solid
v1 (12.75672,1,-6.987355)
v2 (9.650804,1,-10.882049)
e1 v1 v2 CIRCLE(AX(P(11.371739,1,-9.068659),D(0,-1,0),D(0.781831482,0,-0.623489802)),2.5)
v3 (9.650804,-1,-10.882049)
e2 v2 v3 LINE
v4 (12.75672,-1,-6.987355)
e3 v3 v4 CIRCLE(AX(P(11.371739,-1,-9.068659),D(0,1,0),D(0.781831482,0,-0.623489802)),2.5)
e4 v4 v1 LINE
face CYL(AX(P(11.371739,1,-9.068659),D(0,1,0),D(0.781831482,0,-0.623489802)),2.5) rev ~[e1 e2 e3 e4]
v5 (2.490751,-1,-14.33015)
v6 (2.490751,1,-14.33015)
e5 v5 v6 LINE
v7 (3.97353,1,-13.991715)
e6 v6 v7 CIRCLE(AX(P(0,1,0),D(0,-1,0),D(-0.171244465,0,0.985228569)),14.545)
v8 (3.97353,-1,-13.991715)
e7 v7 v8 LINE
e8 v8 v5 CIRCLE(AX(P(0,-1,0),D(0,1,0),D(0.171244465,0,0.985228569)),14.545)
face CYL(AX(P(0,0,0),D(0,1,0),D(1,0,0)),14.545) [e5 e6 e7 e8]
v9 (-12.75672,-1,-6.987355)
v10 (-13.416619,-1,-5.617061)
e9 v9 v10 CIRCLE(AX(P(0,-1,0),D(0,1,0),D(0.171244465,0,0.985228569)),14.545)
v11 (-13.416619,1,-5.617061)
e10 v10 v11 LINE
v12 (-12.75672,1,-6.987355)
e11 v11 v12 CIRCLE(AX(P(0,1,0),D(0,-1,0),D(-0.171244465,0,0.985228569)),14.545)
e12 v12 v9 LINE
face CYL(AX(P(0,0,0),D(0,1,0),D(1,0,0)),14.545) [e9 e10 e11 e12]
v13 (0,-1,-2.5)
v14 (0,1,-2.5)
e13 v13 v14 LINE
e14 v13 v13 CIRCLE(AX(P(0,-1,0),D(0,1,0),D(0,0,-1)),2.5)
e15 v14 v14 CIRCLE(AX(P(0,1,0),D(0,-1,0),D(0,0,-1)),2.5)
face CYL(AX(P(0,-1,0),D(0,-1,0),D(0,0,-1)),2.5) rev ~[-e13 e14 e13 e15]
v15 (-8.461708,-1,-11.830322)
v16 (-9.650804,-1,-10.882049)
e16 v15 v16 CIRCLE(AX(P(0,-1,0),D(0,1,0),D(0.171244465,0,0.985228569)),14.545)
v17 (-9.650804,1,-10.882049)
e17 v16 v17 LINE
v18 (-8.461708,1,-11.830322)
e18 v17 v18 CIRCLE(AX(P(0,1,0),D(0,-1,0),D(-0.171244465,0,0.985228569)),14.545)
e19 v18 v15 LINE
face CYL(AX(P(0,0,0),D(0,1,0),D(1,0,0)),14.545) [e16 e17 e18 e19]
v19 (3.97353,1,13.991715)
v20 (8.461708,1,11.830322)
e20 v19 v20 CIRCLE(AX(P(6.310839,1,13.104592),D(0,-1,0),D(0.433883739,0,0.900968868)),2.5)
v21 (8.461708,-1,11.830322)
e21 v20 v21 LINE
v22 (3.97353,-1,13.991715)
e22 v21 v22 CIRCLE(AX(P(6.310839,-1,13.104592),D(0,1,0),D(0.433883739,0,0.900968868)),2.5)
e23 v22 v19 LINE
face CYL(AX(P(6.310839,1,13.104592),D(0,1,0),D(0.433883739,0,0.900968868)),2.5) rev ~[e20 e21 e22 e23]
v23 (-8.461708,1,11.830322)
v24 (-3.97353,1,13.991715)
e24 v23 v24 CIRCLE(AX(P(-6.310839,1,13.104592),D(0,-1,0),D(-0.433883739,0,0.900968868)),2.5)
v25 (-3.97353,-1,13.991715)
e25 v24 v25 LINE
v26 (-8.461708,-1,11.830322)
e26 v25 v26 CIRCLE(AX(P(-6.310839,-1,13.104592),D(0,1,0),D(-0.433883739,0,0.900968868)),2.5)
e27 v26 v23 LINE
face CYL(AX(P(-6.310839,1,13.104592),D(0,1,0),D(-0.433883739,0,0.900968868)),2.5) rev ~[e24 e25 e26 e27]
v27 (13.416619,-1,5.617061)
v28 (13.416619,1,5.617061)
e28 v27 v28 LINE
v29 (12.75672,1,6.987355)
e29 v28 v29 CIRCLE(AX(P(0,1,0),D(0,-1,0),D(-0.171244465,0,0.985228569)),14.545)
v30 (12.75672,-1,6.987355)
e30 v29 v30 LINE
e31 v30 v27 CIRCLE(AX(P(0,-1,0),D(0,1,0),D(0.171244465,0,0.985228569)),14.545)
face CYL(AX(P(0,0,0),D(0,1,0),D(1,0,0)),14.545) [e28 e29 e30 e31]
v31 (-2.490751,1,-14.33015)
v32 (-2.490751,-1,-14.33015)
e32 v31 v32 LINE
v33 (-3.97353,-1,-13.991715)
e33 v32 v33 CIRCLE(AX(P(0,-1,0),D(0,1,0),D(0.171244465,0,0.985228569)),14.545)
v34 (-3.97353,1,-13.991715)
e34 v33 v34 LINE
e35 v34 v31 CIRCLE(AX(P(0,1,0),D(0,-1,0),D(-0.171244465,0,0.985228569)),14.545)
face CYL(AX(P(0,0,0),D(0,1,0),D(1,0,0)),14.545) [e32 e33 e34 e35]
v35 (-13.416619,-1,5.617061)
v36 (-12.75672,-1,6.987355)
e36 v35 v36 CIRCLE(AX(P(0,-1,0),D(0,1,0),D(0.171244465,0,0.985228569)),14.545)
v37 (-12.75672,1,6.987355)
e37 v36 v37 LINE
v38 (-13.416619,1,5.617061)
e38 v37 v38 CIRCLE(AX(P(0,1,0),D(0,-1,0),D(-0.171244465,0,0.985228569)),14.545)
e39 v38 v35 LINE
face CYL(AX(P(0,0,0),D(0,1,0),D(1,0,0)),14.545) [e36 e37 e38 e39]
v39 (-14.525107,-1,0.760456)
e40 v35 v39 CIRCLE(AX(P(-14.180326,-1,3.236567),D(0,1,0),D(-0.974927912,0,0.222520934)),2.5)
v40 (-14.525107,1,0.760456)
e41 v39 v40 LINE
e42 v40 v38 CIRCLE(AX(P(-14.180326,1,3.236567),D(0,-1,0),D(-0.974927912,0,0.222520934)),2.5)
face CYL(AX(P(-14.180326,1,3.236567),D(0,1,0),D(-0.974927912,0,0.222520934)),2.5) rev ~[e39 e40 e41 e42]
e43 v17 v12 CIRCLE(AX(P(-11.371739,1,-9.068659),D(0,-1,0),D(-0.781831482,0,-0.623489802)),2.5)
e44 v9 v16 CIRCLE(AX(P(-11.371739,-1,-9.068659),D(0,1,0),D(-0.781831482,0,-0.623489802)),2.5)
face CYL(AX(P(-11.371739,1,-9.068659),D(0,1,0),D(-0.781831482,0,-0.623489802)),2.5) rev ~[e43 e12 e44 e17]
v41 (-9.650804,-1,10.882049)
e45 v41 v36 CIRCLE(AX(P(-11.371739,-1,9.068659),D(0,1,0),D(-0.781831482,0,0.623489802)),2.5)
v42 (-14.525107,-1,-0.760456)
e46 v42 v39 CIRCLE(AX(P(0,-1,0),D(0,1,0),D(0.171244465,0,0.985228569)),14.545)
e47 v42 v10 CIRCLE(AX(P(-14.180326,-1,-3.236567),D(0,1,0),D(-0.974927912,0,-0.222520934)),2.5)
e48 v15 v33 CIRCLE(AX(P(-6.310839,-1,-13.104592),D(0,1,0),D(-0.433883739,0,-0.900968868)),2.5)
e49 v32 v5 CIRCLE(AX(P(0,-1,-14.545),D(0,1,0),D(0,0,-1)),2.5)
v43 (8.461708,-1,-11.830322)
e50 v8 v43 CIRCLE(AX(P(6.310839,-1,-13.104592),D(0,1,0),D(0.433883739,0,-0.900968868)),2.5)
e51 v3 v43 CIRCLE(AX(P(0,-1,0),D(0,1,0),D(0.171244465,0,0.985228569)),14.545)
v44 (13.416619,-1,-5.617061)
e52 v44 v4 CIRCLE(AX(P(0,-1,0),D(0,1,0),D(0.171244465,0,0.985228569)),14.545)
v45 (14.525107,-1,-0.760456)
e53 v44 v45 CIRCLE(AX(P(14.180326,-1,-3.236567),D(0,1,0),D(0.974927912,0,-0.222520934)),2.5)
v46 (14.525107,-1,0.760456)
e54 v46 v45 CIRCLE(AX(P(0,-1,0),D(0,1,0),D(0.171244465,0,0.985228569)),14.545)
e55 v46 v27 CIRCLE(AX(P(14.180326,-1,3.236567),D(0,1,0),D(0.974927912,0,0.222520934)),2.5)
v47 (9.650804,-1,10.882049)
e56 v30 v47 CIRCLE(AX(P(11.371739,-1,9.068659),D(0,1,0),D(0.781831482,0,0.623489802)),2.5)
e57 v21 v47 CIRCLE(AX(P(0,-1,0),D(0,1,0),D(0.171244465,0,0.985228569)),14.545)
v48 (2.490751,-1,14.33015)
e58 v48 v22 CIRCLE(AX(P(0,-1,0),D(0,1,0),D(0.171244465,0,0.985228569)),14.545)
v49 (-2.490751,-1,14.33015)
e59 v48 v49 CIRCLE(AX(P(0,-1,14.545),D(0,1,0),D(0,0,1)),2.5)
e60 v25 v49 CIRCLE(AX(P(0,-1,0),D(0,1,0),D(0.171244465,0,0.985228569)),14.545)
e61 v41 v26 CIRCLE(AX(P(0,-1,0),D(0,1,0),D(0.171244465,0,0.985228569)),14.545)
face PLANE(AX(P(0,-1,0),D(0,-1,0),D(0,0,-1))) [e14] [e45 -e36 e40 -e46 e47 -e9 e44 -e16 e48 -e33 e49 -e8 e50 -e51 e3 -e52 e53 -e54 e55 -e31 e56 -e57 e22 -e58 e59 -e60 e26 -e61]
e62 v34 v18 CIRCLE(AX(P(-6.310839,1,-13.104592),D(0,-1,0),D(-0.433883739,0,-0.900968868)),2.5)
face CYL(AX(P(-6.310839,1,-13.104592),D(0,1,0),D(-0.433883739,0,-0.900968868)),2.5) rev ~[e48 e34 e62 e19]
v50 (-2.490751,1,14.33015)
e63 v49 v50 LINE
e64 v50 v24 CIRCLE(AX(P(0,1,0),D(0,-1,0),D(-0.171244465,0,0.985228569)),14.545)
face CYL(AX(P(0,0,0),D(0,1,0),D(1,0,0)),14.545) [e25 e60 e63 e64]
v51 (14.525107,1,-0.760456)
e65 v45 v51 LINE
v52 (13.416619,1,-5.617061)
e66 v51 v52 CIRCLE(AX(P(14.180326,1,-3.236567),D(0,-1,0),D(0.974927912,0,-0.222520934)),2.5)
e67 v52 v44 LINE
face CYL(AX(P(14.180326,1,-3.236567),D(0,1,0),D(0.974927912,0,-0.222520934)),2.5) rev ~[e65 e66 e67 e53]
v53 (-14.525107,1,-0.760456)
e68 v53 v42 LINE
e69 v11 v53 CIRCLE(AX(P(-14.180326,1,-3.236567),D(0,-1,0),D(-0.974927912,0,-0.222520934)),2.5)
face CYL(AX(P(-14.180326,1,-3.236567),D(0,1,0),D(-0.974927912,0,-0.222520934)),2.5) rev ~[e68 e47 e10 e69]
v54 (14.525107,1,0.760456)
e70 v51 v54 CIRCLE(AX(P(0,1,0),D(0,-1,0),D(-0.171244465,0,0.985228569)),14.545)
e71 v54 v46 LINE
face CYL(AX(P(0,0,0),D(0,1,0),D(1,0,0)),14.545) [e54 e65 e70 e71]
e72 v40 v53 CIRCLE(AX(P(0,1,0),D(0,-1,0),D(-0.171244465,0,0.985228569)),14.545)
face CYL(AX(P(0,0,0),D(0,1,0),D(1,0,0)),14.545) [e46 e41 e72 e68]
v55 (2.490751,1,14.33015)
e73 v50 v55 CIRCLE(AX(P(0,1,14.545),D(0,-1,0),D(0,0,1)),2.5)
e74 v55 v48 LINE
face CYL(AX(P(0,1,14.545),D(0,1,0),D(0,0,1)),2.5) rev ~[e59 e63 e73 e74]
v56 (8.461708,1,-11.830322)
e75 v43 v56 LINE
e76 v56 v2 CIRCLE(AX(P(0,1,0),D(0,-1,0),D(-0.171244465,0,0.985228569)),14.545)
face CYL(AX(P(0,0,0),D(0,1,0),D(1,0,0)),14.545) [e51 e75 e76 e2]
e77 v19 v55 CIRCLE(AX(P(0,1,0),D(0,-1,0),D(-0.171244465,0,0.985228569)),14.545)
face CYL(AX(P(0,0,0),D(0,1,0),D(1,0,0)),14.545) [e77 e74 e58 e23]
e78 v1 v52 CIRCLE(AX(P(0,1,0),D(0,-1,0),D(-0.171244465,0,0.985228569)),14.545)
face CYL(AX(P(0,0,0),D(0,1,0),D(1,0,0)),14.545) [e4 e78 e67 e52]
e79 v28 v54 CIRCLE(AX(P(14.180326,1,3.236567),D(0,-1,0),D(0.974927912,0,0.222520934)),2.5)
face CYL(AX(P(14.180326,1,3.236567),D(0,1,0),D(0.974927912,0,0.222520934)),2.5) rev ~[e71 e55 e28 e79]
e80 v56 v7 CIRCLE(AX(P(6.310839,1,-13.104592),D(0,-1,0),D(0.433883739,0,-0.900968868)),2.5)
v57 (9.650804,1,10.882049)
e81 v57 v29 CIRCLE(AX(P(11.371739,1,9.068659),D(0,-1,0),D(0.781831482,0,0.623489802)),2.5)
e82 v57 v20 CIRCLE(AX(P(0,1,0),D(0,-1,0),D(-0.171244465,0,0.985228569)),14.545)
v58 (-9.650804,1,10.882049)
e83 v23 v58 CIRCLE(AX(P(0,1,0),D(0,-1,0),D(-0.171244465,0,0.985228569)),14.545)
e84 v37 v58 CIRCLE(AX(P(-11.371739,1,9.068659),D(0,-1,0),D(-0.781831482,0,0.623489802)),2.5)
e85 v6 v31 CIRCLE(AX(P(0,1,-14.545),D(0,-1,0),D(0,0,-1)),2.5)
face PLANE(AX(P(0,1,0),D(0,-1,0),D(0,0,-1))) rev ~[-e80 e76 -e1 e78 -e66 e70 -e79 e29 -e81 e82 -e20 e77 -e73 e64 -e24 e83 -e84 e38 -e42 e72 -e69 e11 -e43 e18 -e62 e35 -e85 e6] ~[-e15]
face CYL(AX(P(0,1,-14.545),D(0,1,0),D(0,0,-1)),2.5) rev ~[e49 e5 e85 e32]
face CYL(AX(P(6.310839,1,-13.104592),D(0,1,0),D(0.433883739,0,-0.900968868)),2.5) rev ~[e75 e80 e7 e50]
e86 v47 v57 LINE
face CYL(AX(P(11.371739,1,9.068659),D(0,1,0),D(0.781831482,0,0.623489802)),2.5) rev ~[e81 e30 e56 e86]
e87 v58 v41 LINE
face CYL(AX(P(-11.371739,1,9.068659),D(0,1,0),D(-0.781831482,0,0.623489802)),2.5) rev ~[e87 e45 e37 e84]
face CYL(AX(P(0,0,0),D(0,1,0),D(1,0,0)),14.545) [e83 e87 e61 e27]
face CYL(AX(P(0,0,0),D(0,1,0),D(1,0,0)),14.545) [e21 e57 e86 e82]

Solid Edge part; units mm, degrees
sketch "Sketch1" plane through (0, 0, 0) normal (0, -1, 0) x (1, 0, 0)
  circle A0 centre (0, 0) radius 14.545
extrude "Protrusion1" add sketch "Sketch1" along normal mid plane 2
hole "Hole_16" at (0, 1, 14.545) direction (0, -1, 0) diameter 5 end up to next
pattern_circular "Pattern_2" count 14 over 360 about axis through (0, 1, 0) along (0, -1, 0) of "Hole_16"
hole "Hole_30" at (0, -1, 0) direction (0, 1, 0) diameter 5 end up to next
